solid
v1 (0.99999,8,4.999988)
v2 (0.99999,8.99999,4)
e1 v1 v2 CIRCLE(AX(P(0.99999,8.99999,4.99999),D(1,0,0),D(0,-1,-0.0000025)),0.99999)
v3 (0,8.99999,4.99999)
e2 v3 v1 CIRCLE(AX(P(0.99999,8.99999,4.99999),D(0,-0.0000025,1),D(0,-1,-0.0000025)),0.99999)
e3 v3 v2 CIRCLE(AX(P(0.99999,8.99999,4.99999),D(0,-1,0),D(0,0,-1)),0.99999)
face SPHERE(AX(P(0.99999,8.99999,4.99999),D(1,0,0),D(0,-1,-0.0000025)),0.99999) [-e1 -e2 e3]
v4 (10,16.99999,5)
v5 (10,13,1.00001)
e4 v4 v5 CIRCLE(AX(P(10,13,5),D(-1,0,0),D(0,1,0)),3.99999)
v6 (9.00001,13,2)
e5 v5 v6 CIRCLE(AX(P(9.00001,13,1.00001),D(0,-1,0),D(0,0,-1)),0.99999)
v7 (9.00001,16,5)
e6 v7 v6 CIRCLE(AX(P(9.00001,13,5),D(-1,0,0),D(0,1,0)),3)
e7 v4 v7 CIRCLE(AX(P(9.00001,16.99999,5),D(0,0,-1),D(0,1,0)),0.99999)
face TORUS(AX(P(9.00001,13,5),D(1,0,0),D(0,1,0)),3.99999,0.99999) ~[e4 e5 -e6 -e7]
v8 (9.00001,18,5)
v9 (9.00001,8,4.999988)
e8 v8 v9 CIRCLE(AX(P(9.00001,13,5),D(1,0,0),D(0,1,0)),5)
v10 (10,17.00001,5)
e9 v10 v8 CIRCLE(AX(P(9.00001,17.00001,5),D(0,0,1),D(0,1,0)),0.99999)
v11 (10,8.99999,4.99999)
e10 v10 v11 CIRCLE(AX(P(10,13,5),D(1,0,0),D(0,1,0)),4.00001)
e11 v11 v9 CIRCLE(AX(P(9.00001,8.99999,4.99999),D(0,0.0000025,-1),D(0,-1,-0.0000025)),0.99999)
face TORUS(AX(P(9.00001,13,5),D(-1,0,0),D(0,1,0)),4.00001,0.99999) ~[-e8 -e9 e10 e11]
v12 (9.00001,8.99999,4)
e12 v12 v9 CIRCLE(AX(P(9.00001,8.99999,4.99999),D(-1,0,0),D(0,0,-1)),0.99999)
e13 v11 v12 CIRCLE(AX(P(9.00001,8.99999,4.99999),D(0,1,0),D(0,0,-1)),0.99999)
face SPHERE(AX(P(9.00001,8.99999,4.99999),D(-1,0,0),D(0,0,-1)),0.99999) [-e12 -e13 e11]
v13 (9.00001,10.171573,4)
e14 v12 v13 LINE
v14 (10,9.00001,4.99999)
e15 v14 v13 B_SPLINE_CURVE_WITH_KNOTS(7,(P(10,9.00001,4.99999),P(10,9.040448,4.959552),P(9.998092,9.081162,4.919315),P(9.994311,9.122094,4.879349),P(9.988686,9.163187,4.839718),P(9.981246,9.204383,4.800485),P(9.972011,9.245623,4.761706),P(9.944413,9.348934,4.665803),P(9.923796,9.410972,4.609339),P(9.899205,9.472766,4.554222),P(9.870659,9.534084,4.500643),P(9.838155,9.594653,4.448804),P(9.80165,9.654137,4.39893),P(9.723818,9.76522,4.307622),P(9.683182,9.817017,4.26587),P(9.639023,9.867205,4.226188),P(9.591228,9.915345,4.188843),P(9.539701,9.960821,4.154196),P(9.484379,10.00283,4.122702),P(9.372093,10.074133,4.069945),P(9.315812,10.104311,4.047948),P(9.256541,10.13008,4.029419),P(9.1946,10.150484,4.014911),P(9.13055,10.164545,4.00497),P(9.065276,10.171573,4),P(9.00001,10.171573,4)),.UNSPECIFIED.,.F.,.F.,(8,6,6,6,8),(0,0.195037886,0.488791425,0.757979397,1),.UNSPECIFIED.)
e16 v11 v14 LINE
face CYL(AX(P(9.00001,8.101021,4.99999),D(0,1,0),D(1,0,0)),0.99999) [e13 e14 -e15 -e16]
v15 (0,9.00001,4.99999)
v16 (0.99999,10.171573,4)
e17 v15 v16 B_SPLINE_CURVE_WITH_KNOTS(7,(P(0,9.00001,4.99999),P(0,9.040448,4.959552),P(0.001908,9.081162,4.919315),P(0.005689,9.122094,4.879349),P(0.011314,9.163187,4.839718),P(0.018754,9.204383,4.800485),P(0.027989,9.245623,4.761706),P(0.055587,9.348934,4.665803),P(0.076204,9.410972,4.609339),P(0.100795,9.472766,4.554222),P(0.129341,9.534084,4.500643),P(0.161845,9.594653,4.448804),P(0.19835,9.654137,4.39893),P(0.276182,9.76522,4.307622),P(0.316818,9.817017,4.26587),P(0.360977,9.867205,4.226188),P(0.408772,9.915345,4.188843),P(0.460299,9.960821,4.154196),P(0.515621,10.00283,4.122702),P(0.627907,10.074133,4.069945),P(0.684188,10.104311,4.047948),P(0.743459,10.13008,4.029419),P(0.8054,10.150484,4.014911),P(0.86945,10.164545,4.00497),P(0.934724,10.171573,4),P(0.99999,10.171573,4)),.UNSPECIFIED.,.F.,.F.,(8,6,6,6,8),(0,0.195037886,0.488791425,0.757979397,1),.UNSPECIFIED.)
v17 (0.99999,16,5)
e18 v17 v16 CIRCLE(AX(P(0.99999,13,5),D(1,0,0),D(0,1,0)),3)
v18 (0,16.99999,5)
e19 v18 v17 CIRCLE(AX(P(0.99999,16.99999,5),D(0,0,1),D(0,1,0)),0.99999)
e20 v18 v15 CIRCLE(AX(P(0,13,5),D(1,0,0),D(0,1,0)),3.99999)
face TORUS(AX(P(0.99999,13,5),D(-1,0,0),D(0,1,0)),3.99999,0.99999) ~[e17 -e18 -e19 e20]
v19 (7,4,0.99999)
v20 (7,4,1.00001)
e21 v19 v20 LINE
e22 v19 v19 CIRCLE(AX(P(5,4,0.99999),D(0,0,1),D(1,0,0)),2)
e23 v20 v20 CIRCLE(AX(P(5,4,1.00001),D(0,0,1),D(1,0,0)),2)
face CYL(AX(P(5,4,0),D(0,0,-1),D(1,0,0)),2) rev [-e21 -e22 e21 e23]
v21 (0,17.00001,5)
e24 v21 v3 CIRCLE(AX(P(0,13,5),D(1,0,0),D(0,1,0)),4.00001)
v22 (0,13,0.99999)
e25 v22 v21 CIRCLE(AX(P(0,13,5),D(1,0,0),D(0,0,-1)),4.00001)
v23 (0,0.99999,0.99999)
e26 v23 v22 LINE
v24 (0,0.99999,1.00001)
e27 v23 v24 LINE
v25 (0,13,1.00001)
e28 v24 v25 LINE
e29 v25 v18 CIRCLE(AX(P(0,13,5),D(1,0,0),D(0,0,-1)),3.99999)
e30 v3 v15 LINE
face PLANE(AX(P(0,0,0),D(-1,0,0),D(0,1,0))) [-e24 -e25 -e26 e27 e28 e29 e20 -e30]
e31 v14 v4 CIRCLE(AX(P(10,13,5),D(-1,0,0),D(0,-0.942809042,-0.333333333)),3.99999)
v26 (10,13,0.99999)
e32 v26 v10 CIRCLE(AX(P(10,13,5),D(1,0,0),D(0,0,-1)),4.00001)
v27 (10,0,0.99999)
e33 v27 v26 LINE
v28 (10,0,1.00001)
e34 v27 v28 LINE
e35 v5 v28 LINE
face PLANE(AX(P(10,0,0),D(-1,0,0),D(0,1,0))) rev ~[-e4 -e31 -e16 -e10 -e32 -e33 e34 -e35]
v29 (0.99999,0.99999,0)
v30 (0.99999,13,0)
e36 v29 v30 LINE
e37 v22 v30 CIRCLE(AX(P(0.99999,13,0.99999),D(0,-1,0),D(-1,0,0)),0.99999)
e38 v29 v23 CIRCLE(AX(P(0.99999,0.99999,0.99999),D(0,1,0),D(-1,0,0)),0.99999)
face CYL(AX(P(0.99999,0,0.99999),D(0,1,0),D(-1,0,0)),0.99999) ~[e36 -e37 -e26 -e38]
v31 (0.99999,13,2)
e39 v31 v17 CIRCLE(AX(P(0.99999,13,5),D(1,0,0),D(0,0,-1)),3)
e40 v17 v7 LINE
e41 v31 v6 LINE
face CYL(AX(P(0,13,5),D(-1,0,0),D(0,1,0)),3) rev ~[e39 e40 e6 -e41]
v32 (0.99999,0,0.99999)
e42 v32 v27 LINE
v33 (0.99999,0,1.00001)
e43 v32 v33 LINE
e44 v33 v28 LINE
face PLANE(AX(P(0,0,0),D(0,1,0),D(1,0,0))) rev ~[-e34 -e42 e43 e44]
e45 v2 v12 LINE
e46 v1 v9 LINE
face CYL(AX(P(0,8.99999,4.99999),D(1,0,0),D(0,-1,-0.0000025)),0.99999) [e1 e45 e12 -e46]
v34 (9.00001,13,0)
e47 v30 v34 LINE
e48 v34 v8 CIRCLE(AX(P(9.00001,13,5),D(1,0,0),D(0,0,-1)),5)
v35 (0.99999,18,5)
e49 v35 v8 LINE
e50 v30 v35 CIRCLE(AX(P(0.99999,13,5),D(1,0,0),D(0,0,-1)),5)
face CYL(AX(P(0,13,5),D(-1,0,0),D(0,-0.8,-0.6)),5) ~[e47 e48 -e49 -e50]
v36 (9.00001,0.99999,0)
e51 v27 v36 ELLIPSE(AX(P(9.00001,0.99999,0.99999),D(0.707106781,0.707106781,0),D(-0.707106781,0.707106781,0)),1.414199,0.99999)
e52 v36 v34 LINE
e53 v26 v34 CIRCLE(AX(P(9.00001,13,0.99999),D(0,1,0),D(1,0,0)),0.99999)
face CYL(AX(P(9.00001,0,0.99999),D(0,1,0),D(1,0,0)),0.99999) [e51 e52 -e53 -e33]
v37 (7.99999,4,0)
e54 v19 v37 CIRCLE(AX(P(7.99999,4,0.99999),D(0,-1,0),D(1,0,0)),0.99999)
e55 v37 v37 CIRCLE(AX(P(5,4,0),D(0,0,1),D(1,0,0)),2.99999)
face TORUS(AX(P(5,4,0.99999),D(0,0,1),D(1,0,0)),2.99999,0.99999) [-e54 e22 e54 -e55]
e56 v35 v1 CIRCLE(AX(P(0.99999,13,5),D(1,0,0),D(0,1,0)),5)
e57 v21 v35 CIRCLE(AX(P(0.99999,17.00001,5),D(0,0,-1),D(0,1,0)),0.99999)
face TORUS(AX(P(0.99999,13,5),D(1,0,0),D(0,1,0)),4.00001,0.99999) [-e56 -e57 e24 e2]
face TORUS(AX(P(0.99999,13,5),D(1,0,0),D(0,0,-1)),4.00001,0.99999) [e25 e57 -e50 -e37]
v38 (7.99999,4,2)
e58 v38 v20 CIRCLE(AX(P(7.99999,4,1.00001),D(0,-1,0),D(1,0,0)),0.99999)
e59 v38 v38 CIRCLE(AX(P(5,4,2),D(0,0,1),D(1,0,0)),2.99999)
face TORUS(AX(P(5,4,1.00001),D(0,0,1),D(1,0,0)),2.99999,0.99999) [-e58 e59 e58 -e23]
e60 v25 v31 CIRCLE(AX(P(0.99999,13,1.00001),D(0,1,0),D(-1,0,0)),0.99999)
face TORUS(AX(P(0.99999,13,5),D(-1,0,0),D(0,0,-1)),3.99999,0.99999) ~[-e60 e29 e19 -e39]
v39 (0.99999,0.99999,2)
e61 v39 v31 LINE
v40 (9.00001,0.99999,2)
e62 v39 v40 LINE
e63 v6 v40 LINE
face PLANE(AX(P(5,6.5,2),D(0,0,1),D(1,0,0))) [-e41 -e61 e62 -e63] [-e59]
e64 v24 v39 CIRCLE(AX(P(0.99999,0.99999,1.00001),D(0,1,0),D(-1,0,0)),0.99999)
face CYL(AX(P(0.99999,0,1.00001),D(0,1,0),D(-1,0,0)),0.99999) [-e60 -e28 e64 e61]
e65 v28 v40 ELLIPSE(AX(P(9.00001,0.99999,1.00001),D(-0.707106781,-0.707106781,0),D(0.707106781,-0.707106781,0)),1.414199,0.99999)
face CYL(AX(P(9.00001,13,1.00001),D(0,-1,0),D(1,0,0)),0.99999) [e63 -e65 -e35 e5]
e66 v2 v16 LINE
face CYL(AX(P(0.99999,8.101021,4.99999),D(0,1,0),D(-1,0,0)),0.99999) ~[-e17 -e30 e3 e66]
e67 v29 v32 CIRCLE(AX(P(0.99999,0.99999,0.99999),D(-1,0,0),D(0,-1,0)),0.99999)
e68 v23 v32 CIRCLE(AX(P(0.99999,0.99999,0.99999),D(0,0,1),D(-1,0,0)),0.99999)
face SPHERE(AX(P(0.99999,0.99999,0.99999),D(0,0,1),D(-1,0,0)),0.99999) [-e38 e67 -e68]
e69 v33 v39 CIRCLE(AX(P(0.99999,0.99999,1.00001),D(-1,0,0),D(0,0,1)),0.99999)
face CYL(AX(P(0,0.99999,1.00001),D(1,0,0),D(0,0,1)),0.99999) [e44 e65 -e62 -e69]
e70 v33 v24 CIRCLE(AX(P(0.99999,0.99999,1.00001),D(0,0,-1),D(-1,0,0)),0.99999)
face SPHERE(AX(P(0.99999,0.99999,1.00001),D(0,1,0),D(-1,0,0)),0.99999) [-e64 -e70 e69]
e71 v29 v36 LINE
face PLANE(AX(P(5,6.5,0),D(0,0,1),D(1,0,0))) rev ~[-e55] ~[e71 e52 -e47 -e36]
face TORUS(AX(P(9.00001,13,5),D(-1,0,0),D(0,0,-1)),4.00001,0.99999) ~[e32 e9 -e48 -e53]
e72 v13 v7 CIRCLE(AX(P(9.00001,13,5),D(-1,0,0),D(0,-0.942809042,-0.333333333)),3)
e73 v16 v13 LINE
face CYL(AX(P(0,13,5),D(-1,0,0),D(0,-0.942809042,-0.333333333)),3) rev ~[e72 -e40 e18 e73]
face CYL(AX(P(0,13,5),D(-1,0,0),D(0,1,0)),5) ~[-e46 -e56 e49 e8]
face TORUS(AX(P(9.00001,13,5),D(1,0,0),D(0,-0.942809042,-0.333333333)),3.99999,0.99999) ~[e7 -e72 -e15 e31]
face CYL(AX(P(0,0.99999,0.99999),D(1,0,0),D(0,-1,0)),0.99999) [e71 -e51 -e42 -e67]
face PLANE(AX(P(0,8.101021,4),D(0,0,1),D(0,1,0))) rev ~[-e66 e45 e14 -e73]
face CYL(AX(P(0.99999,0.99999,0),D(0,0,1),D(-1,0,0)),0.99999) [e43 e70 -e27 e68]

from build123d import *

# Parameters (mm, degrees)
F0_W     = 10
F0_H     = 13
F0_R     = 2
F1_DEPTH = 2
F3_DEPTH = 10
F4_R     = 0.99999


# Not quite as in the source:
# - a fillet or chamfer is up to 0.001 mm smaller than in the source, because OpenCascade refuses the exact size


with BuildPart() as f1:
    # F0 (on Top) → F1 (new body)
    with BuildSketch(Plane.XY):
        with Locations((5, 6.5)):
            Rectangle(F0_W, F0_H)
        with Locations((5, 4)):
            Circle(F0_R, mode=Mode.SUBTRACT)
    extrude(amount=F1_DEPTH)

    # F2 (on Right) → F3 (join)
    with BuildSketch(Plane.YZ):
        with BuildLine():
            ThreePointArc((9, 2), (14.5811388301, 0.2565835097), (18, 5))
            ThreePointArc((18, 5), (12.49745519, 9.974680765), (8.1010205144, 4))
            Line((8.1010205144, 4), (10.1715728753, 4))
            ThreePointArc((10.1715728753, 4), (12.4926940638, 7.956795679), (16, 5))
            ThreePointArc((16, 5), (15.1213203436, 2.8786796564), (13, 2))
            Line((13, 2), (9, 2))
        make_face()
    extrude(amount=F3_DEPTH)

    # F4 (radius 1 in the source; OpenCascade refuses exactly that, so slightly less here)
    f4_edges = [f1.edges().sort_by_distance(p)[0] for p in [
        (0, 6.5, 2),
        (0, 12.492694, 7.956796),
        (0, 0, 1),
        (0, 6.5, 0),
        (0, 16.162278, 8.872983),
        (0, 9.136297, 4),
        (0, 15.12132, 2.87868),
        (10, 12.492694, 7.956796),
        (10, 16.162278, 8.872983),
        (10, 6.5, 2),
        (10, 6.5, 0),
        (5, 8.101021, 4),
        (10, 9.136297, 4),
        (5, 0, 2),
        (5, 0, 0),
        (3, 4, 2),
        (3, 4, 0),
    ]]
    fillet(f4_edges, radius=F4_R)


solid = f1.part
